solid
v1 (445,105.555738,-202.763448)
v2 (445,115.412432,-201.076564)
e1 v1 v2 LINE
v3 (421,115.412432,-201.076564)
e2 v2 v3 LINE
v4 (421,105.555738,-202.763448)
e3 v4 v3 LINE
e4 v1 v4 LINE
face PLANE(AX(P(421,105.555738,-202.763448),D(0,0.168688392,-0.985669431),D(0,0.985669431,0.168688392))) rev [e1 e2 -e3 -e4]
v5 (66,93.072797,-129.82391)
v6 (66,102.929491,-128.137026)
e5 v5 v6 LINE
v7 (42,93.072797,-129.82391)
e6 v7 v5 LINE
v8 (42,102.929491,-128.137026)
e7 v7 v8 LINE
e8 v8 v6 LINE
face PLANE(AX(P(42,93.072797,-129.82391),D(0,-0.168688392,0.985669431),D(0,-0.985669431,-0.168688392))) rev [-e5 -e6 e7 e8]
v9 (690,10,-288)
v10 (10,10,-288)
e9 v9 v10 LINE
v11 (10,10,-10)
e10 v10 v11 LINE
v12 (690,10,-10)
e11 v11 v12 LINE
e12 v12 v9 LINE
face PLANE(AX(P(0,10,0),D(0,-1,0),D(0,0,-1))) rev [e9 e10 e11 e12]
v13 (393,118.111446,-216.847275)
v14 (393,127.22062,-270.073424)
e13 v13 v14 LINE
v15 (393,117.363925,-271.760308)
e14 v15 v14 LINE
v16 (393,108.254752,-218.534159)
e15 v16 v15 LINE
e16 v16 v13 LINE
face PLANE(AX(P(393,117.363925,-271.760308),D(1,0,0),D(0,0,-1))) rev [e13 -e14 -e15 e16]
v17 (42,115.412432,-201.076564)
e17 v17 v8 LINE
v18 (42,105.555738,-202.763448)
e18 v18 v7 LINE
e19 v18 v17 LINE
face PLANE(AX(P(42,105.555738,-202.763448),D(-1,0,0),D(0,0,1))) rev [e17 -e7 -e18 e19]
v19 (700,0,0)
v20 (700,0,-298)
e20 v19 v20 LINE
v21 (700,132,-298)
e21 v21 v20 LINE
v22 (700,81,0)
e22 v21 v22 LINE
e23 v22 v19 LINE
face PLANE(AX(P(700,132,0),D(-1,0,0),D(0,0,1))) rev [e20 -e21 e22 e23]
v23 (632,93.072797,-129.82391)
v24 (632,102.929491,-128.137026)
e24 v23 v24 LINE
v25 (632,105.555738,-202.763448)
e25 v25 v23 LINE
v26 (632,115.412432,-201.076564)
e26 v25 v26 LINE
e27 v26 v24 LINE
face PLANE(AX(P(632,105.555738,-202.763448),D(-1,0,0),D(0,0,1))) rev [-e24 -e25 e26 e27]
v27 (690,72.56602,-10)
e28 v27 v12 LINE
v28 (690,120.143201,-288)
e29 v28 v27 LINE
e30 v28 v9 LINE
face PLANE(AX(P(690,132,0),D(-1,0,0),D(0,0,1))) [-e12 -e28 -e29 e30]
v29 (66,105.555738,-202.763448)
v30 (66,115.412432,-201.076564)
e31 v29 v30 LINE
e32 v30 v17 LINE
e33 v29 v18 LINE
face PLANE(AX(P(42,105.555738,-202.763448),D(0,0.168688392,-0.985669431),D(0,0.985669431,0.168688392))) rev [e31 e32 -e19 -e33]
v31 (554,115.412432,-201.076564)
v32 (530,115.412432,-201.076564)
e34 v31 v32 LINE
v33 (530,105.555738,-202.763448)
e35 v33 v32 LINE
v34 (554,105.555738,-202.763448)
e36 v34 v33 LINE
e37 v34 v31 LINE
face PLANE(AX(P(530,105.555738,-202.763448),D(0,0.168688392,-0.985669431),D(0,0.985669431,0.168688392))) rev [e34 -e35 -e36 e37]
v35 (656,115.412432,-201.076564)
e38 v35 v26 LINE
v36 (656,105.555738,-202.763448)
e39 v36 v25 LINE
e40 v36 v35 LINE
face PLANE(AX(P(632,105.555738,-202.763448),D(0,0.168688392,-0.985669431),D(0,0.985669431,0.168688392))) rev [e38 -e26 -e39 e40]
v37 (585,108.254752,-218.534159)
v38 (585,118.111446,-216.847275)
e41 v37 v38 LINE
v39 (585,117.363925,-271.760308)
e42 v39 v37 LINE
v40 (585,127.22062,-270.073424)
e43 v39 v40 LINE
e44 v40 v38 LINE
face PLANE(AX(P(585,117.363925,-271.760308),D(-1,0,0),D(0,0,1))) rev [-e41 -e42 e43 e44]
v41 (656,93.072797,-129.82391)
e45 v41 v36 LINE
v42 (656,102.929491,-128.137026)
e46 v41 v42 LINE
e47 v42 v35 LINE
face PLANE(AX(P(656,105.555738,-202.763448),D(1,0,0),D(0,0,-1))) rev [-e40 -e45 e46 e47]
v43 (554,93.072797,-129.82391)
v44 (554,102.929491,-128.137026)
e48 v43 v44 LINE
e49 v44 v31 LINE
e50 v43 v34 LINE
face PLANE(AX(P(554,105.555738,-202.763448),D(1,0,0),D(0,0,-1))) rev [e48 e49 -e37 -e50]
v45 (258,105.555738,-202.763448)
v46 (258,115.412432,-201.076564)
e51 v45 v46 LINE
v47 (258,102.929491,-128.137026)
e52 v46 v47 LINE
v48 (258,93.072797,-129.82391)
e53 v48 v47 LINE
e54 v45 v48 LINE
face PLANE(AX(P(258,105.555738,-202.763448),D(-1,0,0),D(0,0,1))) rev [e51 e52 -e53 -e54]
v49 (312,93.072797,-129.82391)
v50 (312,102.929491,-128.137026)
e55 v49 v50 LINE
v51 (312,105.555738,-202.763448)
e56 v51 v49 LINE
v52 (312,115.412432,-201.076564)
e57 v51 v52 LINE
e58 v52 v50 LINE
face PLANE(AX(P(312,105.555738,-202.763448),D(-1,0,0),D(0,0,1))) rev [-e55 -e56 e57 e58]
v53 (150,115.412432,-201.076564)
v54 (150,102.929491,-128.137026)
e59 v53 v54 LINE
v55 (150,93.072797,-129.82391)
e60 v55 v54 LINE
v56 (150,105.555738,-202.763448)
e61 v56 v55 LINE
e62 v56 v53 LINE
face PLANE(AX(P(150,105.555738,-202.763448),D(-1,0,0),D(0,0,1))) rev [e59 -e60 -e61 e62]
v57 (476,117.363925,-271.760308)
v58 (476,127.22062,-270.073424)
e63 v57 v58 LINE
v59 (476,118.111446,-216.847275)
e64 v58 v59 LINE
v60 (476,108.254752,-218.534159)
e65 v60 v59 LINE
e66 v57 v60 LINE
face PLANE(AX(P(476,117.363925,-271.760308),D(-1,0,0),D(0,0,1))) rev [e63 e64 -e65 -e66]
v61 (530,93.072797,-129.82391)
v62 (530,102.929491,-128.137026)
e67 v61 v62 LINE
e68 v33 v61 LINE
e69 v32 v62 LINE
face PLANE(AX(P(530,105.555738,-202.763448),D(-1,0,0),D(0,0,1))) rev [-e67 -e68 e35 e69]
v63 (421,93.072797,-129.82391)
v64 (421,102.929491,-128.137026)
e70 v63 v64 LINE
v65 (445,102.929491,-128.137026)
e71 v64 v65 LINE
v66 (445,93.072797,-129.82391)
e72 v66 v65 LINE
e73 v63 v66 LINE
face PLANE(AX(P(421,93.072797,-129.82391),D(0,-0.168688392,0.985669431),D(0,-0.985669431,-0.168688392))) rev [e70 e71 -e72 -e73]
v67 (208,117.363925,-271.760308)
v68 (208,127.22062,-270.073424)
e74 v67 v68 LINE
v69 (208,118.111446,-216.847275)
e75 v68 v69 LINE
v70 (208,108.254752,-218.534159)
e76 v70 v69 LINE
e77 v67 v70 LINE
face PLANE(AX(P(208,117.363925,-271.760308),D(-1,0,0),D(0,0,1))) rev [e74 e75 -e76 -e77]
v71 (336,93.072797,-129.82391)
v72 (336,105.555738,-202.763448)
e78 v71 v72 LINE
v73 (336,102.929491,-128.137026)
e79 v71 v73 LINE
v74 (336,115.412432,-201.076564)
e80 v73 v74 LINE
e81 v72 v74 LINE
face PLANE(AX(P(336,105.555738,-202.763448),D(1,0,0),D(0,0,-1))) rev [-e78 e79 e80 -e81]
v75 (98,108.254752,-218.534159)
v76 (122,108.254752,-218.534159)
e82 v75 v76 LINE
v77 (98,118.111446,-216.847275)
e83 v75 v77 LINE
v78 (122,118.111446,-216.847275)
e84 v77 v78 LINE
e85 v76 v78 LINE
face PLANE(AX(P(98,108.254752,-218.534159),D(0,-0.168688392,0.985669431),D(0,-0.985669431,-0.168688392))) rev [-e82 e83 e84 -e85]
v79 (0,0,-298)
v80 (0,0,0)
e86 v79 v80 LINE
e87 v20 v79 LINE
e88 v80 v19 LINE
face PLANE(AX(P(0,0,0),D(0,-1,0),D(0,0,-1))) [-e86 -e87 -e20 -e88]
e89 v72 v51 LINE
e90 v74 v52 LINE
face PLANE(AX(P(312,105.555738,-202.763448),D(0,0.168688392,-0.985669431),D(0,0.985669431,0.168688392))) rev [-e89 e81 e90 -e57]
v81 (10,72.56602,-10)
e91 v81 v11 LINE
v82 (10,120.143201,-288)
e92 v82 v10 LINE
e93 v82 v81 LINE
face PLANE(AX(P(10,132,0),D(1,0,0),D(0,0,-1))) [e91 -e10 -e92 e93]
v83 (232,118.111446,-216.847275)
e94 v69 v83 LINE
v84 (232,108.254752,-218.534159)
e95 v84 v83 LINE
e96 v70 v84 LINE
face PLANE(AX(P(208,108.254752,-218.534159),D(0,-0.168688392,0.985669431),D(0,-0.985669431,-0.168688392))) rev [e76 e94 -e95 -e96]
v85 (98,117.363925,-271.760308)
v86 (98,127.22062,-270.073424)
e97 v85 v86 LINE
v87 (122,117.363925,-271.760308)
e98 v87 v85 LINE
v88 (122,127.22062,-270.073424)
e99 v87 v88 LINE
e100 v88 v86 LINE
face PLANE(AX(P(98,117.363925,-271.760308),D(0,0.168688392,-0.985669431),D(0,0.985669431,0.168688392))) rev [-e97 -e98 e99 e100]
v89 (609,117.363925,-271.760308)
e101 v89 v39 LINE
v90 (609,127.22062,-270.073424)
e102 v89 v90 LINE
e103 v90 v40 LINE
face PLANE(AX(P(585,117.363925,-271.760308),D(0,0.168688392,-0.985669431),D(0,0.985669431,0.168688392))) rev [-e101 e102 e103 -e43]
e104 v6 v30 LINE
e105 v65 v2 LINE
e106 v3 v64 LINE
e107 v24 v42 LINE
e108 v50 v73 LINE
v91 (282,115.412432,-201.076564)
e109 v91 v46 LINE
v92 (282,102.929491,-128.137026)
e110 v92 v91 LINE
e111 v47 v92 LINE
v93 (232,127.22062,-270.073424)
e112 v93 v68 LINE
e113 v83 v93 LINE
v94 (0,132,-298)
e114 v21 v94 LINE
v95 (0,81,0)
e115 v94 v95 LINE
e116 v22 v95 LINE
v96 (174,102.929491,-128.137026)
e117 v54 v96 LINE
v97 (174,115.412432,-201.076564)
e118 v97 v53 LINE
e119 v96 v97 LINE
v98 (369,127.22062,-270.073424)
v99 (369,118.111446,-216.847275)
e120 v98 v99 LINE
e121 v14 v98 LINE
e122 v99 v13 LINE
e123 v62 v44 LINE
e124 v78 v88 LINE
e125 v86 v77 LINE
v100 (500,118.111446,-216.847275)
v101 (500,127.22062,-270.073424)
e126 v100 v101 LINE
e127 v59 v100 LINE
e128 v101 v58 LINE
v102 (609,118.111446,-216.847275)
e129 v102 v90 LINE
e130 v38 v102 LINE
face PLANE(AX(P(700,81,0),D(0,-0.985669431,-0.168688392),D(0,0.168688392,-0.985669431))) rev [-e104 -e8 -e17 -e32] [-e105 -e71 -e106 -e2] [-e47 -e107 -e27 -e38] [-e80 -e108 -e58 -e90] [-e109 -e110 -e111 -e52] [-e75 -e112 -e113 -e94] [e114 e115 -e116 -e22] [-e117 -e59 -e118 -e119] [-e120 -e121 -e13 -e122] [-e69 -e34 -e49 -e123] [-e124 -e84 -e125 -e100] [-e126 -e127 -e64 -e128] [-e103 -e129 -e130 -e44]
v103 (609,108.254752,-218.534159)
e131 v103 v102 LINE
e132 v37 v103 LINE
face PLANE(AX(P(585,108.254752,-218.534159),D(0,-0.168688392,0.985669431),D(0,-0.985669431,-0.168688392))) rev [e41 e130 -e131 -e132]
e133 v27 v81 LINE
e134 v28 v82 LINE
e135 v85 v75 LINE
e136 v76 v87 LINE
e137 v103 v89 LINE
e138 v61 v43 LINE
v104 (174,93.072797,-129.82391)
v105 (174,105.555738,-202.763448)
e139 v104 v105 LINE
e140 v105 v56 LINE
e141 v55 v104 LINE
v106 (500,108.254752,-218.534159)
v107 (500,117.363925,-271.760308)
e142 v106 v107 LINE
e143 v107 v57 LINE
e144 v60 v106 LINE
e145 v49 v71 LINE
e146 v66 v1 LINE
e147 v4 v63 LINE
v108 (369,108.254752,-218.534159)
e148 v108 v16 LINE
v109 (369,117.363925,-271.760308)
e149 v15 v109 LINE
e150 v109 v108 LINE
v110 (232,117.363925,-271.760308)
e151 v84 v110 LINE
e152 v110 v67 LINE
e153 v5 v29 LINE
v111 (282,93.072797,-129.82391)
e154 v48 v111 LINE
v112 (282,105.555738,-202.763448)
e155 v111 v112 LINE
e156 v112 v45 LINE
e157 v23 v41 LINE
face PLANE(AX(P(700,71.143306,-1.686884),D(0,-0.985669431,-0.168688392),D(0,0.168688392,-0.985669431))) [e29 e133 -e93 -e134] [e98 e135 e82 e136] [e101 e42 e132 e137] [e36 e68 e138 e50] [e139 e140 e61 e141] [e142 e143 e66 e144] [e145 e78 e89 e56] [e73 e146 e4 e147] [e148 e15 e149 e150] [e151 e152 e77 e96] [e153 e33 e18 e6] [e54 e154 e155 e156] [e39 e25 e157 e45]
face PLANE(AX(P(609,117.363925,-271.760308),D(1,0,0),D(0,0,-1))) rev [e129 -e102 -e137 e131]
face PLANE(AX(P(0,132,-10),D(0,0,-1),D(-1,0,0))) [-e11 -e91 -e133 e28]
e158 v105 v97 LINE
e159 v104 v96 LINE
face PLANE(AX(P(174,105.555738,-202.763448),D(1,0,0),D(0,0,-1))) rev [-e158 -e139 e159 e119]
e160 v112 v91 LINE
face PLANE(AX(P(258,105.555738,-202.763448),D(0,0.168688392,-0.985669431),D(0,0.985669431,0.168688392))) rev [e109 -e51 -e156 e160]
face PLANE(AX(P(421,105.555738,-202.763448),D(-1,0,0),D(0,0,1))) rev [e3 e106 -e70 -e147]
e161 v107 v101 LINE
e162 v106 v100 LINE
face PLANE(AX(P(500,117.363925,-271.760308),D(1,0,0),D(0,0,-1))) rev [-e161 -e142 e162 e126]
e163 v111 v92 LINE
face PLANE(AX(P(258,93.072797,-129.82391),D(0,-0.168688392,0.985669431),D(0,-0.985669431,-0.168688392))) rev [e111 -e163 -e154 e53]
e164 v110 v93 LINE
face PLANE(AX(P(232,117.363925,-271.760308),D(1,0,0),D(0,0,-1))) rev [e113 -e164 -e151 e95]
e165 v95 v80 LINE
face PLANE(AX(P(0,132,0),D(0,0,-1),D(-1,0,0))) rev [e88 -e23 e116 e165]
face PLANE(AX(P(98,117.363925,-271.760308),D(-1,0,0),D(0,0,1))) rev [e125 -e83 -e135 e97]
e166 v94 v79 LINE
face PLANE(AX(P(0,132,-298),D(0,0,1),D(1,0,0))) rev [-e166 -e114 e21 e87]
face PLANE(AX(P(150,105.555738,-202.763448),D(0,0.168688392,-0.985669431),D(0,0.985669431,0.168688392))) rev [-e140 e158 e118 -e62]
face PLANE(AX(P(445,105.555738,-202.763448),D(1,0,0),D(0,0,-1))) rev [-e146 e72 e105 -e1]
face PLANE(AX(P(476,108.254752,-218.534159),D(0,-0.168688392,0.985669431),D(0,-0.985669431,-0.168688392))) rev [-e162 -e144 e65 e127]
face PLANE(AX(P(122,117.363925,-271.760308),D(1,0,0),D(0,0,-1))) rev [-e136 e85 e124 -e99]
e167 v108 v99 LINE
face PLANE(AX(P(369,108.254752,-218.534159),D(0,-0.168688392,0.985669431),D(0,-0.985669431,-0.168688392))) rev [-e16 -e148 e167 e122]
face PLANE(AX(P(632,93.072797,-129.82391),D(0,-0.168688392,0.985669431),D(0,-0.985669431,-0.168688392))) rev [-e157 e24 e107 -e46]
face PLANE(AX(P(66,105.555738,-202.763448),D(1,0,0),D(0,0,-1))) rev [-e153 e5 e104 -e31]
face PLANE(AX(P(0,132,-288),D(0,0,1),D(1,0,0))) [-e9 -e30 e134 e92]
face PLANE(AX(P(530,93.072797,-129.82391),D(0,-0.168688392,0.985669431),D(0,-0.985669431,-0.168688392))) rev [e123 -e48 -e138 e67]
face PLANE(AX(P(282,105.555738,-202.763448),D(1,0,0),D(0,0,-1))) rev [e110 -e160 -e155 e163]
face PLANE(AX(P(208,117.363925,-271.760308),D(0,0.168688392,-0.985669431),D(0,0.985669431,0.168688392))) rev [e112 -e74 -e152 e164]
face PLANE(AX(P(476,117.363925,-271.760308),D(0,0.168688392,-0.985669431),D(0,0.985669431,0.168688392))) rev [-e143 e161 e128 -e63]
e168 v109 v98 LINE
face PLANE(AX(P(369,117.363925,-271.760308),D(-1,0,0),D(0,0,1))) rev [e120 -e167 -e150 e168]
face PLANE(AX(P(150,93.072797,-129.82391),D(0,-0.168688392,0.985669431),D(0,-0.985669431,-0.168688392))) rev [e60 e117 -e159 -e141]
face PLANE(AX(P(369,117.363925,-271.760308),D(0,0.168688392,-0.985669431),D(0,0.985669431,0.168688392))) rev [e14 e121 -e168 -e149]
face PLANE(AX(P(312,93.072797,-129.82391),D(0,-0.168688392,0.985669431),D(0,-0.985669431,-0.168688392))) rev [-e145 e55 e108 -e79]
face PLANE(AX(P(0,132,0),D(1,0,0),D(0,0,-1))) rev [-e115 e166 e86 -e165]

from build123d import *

# Parameters (mm, degrees)
CROQUIS1_W              = 700
CROQUIS1_H              = 298
SALIENTE_EXTRUIR1_DEPTH = 132
CORTAR_EXTRUIR1_DEPTH   = 773.158014917
CROQUIS5_W              = 24
CROQUIS5_H              = 74
CROQUIS5_H_2            = 54
CORTAR_EXTRUIR2_DEPTH   = 10
VACIADO2_START          = 10
VACIADO2_DEPTH          = 680


# Read off the part's stored shape, not the designer's step: Vaciado2
with BuildPart() as part:
    # Croquis1 → Saliente-Extruir1 (new body)
    with BuildSketch(Plane(origin=(0, 0, 0), x_dir=(1, 0, 0), z_dir=(0, 1, 0))):
        with Locations((350, 149)):
            Rectangle(CROQUIS1_W, CROQUIS1_H)
    extrude(amount=SALIENTE_EXTRUIR1_DEPTH)

    # Croquis3 → Cortar-Extruir1 (cut, through all)
    with BuildSketch(Plane.ZY):
        Polygon((0, 81), (-298, 132), (0, 132), align=None)
    extrude(amount=-CORTAR_EXTRUIR1_DEPTH, mode=Mode.SUBTRACT)

    # Croquis5 → Cortar-Extruir2 (cut)
    with BuildSketch(Plane(origin=(0, 78.695082326, 13.467950331), x_dir=(1, 0, 0), z_dir=(0, 0.9856694305119892, 0.16868839247017262))):
        with Locations((54, 180.66375979)):
            Rectangle(CROQUIS5_W, CROQUIS5_H)
        with Locations((162, 180.66375979)):
            Rectangle(CROQUIS5_W, CROQUIS5_H)
        with Locations((270, 180.66375979)):
            Rectangle(CROQUIS5_W, CROQUIS5_H)
        with Locations((324, 180.66375979)):
            Rectangle(CROQUIS5_W, CROQUIS5_H)
        with Locations((433, 180.66375979)):
            Rectangle(CROQUIS5_W, CROQUIS5_H)
        with Locations((542, 180.66375979)):
            Rectangle(CROQUIS5_W, CROQUIS5_H)
        with Locations((644, 180.66375979)):
            Rectangle(CROQUIS5_W, CROQUIS5_H)
        with Locations((110, 260.66375979)):
            Rectangle(CROQUIS5_W, CROQUIS5_H_2)
        with Locations((220, 260.66375979)):
            Rectangle(CROQUIS5_W, CROQUIS5_H_2)
        with Locations((381, 260.66375979)):
            Rectangle(CROQUIS5_W, CROQUIS5_H_2)
        with Locations((488, 260.66375979)):
            Rectangle(CROQUIS5_W, CROQUIS5_H_2)
        with Locations((597, 260.66375979)):
            Rectangle(CROQUIS5_W, CROQUIS5_H_2)
    extrude(amount=-CORTAR_EXTRUIR2_DEPTH, mode=Mode.SUBTRACT)

    # Vaciado2 outline → Vaciado2 (cut)
    with BuildSketch(Plane.YZ.offset(VACIADO2_START)):
        Polygon((93.072796716, -129.823909891), (72.566020191, -10), (10, -10), (10, -288), (120.143201399, -288), (117.363925232, -271.760307885), (108.254752038, -218.534158637), (105.555737759, -202.763447749), align=None)
    extrude(amount=VACIADO2_DEPTH, mode=Mode.SUBTRACT)


solid = part.part
